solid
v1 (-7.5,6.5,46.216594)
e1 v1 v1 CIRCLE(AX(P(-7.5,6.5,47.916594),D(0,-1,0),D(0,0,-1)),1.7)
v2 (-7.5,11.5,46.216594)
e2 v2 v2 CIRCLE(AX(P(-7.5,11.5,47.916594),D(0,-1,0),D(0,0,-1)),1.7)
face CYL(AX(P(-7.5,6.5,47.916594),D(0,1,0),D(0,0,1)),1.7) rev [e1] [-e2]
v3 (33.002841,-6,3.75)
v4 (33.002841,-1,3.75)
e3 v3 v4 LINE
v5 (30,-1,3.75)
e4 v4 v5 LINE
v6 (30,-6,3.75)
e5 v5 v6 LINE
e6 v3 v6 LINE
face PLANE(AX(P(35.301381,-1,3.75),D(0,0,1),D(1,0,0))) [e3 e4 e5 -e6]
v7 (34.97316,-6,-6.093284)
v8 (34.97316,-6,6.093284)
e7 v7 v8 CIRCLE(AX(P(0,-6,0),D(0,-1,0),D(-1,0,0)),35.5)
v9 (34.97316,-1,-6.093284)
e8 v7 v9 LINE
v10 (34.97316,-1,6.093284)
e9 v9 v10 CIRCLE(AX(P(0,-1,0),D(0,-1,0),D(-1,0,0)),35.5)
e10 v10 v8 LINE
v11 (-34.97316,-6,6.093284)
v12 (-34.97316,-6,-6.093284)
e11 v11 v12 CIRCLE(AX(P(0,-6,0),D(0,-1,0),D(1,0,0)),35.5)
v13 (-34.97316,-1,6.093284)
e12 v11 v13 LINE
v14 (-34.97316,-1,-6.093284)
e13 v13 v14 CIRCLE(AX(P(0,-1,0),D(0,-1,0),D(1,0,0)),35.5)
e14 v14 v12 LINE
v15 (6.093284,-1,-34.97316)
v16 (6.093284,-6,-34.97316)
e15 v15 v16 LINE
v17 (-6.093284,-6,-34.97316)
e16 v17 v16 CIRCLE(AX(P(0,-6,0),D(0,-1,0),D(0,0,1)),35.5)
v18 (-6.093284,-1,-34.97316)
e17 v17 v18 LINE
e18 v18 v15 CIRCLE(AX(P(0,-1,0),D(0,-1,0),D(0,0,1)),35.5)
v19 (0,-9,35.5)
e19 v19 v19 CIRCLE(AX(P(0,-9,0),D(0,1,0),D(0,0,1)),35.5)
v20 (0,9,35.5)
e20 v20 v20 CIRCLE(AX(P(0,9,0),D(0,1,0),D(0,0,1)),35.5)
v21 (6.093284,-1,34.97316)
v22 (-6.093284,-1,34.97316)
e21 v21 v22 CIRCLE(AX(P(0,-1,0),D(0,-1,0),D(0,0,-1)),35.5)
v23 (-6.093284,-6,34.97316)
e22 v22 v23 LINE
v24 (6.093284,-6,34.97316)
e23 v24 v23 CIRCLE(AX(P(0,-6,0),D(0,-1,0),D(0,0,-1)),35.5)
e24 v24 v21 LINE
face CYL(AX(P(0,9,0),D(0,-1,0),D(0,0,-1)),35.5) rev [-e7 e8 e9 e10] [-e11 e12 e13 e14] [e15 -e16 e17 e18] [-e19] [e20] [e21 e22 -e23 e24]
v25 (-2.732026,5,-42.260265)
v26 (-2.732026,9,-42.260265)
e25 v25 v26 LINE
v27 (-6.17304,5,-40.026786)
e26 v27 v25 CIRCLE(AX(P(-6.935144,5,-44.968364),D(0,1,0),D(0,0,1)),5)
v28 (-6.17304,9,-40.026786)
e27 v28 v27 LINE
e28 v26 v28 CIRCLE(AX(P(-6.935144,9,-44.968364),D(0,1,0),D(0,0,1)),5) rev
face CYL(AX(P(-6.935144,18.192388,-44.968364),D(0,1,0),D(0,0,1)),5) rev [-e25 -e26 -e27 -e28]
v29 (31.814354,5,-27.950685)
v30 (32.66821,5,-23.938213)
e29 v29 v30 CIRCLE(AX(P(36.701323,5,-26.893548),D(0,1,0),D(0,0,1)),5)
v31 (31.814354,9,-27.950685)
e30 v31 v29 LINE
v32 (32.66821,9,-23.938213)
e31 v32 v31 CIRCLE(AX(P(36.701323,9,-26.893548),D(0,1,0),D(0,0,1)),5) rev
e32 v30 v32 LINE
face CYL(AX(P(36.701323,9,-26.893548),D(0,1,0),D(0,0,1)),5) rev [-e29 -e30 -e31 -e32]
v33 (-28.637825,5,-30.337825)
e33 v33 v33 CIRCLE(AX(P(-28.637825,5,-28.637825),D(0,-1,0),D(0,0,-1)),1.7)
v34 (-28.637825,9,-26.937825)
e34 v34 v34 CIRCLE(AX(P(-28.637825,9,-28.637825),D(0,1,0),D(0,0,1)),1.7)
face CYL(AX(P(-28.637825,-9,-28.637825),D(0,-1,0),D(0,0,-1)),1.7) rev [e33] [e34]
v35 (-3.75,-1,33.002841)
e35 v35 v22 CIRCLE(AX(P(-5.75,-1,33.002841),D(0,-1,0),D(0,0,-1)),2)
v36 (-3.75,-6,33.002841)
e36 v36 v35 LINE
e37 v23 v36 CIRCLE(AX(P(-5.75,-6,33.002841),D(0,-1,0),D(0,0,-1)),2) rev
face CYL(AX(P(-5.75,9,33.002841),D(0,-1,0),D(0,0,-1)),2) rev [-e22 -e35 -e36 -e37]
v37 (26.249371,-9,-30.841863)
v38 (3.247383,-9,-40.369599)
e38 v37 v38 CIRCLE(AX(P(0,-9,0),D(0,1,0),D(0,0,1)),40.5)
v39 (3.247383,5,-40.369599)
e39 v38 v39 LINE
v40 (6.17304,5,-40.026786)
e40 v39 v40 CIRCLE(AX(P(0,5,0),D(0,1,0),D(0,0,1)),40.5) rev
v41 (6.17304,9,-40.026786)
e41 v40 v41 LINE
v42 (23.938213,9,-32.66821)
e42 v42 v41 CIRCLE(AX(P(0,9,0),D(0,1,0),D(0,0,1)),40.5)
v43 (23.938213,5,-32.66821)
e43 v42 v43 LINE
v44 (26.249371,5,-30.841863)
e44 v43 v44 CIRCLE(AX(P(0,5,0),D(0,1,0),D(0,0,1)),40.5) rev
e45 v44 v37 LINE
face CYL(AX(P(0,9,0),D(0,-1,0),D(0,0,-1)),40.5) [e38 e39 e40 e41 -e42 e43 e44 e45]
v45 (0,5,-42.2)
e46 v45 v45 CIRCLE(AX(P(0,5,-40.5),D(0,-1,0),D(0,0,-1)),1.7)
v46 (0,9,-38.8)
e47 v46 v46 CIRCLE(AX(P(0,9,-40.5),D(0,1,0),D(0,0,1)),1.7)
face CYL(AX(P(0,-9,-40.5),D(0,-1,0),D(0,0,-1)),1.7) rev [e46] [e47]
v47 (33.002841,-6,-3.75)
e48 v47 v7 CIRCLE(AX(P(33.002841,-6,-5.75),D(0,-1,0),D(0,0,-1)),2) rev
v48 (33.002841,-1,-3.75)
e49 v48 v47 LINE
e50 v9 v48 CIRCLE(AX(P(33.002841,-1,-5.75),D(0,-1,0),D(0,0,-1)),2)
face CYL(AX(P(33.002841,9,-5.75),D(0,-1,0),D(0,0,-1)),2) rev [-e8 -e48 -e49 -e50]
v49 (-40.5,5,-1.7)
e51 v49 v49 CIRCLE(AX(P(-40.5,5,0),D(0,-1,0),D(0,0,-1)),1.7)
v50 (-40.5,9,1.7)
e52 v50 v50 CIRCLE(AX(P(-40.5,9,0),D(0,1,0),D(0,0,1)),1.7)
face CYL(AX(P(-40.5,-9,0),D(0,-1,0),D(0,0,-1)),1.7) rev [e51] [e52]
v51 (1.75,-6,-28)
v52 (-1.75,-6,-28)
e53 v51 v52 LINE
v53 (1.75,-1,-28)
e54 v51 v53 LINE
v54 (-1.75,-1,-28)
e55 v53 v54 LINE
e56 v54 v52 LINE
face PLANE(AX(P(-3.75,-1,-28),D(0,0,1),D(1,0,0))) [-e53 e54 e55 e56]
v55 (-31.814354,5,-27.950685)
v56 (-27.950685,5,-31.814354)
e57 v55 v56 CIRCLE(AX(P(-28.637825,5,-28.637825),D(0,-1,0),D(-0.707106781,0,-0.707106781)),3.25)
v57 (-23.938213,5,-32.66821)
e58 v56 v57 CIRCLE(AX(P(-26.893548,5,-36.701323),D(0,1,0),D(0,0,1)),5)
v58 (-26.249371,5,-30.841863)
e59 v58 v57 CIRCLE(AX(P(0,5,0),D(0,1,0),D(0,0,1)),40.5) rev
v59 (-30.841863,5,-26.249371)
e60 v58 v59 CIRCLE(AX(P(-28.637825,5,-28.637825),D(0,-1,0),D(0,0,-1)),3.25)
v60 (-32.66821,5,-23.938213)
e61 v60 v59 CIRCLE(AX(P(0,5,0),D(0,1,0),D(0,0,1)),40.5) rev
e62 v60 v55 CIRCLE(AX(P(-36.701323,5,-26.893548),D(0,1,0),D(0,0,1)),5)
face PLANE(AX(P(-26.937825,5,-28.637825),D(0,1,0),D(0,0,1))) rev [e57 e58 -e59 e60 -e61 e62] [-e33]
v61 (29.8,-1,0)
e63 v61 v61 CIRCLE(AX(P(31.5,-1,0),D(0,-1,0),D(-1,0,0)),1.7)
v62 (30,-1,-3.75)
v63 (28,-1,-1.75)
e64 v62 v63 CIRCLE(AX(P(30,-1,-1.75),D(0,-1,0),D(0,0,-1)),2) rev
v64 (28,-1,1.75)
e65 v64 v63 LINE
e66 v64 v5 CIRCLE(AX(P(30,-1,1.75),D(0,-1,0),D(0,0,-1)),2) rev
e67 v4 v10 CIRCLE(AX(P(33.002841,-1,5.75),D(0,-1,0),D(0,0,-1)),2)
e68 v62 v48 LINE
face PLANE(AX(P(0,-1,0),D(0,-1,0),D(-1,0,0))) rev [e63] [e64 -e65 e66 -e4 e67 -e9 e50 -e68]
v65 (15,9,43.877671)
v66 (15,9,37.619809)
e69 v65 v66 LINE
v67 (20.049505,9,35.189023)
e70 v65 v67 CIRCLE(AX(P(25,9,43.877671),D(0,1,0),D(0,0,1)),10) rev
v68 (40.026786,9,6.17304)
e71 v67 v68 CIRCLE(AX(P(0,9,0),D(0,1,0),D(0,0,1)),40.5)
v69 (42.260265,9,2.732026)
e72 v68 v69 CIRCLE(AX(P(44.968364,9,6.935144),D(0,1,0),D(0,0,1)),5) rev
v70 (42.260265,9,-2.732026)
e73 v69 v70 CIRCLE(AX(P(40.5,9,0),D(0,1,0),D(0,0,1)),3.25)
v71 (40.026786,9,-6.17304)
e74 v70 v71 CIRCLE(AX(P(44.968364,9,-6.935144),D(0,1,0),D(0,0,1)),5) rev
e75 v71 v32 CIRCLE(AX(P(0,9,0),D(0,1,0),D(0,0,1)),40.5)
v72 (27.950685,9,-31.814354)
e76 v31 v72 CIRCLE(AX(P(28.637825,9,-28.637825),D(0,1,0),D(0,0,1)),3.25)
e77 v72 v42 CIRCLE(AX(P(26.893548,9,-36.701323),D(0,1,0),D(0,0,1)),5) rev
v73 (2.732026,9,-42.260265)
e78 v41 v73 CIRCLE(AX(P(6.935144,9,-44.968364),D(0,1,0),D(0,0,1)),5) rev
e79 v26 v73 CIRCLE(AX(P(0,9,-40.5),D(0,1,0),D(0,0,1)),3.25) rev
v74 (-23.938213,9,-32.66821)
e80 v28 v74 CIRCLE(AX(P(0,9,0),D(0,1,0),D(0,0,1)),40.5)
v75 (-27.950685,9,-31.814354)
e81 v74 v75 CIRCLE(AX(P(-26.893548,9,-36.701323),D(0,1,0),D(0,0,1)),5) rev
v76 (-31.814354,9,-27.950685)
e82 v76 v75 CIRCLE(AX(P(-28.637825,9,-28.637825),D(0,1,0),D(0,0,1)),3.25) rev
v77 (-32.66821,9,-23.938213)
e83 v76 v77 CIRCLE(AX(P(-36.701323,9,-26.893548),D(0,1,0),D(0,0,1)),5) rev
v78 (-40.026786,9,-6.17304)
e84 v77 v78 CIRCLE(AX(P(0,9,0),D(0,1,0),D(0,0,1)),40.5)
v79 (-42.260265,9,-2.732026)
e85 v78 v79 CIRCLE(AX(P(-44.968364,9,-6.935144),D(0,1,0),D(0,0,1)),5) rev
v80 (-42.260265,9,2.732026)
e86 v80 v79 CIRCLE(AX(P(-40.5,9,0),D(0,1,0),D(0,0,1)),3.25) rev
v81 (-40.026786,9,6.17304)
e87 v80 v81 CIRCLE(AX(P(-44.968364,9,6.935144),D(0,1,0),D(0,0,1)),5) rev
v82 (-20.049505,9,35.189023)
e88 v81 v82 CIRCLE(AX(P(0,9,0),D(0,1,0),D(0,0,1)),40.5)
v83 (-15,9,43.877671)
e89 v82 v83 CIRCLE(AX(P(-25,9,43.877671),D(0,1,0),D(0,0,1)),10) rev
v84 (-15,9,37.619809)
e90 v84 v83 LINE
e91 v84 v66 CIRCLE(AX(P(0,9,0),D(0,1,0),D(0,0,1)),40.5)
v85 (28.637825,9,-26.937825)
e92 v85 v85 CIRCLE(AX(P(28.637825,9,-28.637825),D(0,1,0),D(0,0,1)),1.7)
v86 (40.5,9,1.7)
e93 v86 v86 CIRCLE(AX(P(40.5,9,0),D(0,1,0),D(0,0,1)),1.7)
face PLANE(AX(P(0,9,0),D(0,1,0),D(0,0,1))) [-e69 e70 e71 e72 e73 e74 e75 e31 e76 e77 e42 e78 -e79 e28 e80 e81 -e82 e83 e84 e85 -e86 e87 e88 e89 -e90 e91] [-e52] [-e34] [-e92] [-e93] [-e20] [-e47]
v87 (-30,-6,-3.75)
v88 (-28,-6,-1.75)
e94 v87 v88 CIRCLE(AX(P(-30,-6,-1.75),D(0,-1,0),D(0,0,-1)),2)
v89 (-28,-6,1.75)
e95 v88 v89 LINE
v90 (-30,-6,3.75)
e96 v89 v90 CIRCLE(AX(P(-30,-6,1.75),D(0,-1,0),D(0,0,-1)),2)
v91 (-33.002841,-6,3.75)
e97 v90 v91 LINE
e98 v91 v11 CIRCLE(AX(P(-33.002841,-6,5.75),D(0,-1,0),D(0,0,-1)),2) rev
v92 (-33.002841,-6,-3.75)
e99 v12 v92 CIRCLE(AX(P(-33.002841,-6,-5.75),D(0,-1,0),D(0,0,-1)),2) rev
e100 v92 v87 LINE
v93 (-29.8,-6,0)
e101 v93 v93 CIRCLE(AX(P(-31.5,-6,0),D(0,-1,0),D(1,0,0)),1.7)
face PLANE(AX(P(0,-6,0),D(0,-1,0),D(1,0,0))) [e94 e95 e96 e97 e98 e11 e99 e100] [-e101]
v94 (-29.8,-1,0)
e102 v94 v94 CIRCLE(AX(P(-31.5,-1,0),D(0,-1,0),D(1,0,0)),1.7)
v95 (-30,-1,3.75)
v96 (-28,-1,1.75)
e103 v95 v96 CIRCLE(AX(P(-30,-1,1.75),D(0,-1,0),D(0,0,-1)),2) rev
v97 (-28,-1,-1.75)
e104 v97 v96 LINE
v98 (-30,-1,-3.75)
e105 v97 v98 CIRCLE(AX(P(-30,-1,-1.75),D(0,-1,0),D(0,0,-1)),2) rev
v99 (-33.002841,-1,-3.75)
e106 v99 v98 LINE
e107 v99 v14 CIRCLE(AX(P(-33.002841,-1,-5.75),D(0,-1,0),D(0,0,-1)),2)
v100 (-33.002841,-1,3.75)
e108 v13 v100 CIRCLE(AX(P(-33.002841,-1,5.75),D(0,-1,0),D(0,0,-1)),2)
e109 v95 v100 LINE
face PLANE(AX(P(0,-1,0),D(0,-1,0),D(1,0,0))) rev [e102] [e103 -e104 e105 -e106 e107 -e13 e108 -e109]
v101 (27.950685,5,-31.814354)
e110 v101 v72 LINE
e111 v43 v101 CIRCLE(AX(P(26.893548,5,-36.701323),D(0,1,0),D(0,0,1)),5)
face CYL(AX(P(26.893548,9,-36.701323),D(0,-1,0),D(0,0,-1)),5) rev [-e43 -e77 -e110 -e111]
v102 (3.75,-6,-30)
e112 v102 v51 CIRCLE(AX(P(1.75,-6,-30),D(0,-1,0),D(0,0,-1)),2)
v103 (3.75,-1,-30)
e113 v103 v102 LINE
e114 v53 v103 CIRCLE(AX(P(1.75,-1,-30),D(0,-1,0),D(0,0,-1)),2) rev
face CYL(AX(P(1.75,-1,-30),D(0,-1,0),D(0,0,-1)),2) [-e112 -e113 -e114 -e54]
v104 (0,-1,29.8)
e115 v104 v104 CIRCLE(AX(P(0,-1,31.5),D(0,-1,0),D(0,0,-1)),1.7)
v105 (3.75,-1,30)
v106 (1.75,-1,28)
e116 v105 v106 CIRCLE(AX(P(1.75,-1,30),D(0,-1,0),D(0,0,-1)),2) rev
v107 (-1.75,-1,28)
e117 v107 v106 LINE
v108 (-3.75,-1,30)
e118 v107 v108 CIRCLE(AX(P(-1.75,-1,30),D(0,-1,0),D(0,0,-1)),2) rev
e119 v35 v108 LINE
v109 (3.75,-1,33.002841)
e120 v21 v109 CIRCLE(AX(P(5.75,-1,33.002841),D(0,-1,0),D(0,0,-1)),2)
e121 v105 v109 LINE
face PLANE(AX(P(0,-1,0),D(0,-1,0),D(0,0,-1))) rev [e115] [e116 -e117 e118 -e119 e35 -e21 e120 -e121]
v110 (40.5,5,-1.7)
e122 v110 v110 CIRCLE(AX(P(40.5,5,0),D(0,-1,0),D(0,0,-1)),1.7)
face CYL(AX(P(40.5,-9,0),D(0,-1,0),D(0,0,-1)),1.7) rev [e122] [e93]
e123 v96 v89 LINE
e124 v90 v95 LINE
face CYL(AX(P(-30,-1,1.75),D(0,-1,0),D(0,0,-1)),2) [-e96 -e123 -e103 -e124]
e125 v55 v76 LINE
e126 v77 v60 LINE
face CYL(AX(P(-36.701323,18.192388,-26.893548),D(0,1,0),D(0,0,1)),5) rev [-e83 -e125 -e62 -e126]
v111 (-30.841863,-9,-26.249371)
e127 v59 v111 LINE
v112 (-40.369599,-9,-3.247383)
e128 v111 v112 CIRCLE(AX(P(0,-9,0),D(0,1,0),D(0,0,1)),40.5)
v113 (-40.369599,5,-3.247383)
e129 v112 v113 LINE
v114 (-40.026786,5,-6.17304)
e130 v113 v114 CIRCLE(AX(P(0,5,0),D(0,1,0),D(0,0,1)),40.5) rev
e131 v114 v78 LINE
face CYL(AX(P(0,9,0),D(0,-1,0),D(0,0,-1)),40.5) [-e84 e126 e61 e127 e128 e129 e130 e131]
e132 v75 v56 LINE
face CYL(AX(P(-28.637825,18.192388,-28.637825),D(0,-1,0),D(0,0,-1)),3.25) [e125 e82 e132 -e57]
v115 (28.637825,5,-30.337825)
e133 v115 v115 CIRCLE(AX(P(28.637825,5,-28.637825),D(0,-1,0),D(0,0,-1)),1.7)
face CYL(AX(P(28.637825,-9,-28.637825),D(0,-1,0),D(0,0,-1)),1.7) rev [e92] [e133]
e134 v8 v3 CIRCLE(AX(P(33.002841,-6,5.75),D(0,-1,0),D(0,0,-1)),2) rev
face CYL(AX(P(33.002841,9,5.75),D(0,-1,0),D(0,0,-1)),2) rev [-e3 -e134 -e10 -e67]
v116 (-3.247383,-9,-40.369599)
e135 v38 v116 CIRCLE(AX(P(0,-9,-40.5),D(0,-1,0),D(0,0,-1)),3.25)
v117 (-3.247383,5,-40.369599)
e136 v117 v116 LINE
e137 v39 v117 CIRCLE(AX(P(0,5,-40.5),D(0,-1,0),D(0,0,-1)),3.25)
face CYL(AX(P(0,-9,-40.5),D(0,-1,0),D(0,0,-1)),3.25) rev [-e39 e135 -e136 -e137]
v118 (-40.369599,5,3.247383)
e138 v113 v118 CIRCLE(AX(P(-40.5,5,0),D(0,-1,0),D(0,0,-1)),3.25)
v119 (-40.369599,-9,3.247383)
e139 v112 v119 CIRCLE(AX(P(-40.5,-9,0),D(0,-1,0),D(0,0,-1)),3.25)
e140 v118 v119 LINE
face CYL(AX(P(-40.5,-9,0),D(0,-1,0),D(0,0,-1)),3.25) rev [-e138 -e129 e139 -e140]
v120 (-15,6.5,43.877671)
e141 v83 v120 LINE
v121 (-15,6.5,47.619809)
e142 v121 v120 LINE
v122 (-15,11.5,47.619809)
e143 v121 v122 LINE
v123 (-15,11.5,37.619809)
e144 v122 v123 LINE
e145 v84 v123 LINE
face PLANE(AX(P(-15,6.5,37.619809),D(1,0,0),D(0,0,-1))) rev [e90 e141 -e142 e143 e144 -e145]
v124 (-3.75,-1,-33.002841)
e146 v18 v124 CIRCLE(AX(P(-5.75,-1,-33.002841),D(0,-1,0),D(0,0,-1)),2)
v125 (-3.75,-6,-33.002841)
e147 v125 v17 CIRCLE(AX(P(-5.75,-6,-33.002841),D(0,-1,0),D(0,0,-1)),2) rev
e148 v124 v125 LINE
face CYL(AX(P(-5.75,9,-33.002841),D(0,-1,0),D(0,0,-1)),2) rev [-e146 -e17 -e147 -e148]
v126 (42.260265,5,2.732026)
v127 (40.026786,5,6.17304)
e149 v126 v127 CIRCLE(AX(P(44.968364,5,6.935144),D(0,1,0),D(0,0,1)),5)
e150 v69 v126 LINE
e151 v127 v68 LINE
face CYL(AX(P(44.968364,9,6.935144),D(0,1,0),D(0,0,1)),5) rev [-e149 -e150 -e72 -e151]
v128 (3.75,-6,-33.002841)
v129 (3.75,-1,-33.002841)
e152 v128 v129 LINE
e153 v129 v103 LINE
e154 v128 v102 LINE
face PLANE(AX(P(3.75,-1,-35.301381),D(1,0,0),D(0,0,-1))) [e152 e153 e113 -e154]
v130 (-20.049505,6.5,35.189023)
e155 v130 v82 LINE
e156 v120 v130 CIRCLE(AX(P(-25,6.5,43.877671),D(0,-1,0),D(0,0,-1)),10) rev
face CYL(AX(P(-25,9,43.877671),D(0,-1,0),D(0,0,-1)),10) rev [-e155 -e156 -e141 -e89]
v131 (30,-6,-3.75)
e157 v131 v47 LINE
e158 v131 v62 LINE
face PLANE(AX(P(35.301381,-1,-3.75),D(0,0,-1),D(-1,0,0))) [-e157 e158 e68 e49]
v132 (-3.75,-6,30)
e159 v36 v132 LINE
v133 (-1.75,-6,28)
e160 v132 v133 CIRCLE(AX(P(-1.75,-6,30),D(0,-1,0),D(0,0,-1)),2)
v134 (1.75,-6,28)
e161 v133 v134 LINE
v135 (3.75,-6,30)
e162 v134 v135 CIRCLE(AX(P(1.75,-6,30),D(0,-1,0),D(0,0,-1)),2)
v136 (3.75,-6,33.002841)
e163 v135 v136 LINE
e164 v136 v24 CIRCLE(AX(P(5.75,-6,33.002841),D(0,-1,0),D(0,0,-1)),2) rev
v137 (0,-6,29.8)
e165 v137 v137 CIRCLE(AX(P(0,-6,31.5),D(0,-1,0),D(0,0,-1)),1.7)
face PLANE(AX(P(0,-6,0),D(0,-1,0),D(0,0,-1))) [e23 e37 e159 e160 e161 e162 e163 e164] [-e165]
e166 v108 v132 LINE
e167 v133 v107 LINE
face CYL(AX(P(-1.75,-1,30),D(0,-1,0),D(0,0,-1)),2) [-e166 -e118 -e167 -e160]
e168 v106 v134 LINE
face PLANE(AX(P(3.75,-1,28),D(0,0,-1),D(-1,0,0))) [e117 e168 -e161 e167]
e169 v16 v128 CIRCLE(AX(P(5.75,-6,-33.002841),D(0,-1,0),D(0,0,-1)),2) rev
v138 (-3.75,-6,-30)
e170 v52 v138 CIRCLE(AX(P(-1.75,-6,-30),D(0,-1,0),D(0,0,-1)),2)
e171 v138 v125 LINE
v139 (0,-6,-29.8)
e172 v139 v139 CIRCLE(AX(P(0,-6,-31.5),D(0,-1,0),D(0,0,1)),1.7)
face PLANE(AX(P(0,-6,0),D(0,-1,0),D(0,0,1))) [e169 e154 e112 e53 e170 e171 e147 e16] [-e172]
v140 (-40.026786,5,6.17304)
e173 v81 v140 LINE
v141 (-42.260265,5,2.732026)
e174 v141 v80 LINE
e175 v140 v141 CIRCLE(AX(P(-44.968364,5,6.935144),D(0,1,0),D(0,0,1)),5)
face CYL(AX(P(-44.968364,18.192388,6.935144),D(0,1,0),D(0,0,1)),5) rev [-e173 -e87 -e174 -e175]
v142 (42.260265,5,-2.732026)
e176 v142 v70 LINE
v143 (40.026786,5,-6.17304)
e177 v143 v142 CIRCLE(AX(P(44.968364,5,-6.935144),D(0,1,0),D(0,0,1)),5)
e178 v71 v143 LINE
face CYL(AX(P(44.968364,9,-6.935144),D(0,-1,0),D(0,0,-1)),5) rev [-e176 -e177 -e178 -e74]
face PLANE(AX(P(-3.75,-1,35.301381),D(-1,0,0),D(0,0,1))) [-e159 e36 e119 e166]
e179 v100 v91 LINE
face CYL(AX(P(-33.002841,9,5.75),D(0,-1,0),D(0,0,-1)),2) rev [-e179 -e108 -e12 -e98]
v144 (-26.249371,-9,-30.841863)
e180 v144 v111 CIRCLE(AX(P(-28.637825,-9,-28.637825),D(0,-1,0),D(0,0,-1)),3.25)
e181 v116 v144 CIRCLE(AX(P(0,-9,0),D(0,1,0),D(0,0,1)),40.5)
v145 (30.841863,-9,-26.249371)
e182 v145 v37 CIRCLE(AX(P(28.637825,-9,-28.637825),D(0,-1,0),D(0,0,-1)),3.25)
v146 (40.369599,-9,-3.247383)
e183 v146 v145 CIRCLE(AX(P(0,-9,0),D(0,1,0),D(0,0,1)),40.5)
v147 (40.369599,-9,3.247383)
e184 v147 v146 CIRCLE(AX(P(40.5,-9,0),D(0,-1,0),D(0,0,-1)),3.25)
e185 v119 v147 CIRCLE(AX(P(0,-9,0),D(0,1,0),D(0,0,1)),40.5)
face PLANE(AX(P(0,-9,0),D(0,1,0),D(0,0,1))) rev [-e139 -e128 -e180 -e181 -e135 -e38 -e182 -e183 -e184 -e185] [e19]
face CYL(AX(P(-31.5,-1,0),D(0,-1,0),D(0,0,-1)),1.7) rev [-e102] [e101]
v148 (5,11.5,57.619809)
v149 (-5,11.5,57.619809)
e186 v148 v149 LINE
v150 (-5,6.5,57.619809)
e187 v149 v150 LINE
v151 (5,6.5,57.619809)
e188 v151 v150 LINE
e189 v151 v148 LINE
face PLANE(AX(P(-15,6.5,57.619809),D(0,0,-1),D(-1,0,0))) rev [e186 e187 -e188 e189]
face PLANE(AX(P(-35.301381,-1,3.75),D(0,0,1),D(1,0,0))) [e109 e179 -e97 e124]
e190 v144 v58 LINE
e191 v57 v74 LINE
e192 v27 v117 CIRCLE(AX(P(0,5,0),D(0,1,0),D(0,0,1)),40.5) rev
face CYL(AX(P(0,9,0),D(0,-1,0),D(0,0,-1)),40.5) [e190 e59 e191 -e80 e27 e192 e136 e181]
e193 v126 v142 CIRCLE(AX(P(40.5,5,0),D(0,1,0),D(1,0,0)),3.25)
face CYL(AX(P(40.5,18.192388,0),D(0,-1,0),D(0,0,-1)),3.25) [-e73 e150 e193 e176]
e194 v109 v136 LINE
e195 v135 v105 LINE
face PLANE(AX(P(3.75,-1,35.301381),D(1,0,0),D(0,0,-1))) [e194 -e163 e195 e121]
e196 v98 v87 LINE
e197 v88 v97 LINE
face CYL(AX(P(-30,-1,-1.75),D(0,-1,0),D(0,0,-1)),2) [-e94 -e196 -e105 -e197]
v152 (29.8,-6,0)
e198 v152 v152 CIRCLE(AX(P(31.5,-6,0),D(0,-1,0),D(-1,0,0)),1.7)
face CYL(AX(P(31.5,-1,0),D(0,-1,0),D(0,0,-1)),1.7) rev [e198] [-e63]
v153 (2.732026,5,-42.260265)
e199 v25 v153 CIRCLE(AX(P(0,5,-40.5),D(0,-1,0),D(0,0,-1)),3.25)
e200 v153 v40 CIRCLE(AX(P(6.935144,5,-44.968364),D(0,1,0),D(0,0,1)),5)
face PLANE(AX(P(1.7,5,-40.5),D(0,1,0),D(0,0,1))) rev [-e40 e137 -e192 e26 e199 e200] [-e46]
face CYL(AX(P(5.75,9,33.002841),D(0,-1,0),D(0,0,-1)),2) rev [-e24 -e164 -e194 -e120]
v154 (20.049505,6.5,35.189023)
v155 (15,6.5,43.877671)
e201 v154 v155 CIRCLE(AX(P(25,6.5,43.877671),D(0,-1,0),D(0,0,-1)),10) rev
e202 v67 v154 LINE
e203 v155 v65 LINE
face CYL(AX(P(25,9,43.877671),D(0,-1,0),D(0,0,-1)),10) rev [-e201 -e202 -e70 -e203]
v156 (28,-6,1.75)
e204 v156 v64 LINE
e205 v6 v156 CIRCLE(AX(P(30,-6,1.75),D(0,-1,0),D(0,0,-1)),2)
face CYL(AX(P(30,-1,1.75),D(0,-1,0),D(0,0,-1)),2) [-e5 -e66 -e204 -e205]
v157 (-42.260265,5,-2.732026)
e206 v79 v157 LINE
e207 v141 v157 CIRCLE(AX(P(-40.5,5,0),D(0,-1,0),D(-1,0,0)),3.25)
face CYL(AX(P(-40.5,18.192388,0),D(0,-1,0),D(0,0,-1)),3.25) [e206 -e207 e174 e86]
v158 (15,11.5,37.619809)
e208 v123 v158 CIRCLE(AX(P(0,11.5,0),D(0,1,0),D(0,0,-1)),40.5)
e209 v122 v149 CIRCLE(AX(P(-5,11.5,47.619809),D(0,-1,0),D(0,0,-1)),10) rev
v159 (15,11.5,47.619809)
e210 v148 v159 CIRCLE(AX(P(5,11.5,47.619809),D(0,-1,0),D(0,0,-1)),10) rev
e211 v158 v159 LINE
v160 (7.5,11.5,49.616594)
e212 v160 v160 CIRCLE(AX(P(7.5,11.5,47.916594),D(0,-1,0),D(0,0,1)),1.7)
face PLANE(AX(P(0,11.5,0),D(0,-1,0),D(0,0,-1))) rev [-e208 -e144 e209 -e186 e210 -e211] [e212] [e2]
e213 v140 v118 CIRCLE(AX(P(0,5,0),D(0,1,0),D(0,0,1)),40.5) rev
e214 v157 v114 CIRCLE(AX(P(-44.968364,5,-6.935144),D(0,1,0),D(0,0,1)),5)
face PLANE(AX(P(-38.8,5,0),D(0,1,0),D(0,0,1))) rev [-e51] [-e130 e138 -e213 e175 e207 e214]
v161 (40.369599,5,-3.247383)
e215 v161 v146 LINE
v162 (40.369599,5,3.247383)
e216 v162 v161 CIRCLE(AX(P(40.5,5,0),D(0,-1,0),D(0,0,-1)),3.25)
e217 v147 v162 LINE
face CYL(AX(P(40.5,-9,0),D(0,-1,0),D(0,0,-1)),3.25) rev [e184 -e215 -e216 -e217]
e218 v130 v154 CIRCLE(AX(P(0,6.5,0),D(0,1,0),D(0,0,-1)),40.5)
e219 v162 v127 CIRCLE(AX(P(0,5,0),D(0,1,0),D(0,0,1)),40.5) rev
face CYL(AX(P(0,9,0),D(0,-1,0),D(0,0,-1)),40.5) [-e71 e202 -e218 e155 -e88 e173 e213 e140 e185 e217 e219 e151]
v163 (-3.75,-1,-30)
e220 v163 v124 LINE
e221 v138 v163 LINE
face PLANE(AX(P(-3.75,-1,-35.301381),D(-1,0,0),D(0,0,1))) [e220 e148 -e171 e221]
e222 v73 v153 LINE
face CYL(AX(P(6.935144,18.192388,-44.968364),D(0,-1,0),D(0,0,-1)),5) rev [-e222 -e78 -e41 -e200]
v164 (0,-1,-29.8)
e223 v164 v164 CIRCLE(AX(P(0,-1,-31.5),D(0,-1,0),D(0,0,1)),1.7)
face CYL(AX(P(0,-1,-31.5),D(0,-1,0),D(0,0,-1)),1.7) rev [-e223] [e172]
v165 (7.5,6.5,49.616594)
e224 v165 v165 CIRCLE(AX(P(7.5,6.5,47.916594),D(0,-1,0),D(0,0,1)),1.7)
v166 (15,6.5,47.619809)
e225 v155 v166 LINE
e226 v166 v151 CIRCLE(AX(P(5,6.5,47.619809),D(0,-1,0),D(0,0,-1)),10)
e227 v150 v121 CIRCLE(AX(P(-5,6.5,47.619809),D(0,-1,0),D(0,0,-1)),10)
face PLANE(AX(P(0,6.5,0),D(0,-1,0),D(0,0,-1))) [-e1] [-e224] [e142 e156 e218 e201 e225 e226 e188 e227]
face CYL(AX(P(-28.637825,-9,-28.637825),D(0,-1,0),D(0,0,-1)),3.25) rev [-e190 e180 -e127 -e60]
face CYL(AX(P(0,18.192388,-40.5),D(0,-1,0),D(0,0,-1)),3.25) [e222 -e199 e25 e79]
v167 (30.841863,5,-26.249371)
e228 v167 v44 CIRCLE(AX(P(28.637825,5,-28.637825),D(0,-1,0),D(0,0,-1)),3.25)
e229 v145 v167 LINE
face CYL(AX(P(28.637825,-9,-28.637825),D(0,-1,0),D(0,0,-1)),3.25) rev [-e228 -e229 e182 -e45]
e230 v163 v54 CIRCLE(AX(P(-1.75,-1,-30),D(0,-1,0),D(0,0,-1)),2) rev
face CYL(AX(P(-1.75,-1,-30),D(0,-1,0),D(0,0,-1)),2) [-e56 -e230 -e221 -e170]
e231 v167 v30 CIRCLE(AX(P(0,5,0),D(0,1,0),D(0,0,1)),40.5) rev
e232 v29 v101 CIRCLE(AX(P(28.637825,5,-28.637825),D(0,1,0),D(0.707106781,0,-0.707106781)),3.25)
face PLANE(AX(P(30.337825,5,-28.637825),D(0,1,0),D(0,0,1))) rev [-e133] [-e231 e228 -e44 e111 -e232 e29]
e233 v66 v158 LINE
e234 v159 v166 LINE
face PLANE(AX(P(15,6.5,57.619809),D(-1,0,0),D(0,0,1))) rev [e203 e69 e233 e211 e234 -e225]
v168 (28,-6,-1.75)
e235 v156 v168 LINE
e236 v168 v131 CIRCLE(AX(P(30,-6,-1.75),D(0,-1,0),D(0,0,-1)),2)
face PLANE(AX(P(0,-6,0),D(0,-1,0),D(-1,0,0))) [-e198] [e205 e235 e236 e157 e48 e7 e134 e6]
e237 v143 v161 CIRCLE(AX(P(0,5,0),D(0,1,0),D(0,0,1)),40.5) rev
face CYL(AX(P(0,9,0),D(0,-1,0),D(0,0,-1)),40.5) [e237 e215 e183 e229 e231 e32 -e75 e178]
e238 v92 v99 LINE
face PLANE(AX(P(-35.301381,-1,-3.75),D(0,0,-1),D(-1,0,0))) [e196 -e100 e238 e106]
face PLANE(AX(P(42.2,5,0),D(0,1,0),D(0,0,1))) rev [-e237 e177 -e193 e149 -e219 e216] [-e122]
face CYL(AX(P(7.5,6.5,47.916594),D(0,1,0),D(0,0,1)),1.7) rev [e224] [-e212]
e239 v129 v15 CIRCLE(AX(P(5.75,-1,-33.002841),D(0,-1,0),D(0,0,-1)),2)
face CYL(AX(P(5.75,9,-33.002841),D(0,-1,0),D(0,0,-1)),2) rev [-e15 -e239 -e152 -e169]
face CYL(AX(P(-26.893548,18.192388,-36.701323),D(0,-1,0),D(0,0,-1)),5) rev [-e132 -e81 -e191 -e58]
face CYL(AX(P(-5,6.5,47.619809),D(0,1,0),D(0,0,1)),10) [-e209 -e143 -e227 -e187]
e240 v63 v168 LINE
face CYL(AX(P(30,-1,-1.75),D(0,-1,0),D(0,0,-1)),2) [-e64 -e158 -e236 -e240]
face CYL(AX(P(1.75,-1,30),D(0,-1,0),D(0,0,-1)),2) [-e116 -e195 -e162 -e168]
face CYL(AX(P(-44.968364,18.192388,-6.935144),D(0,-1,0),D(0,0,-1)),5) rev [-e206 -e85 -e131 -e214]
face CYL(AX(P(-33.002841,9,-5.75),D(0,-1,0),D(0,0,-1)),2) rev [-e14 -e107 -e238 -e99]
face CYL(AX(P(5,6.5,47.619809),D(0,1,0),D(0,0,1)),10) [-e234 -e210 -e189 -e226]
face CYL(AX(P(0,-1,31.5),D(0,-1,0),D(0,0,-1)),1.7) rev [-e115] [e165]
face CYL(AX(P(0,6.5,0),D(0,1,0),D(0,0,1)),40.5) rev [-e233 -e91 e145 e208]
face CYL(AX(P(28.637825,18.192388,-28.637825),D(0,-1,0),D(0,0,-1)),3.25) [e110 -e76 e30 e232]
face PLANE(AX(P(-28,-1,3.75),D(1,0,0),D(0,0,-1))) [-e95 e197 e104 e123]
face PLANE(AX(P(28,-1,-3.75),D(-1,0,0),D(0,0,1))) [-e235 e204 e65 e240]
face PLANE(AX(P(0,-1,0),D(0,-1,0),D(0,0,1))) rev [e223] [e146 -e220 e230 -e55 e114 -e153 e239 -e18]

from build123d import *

# Parameters (mm, degrees)
CROQUIS1_R                                           = 40.5
CROQUIS1_R_2                                         = 35.5
SALIENTE_EXTRUIR1_DEPTH                              = 9
CROQUIS2_R                                           = 1.7
SALIENTE_EXTRUIR2_DEPTH                              = 2.5
REDONDEO1_R                                          = 10
CROQUIS4_R                                           = 1.7
SALIENTE_EXTRUIR3_DEPTH                              = 5
REDONDEO2_R                                          = 2
MATRIZC1_COUNT                                       = 4
REDONDEO2_OF_MATRIZC1_R                              = 2
REFRENTADO_PARA_TORNILLO_CON_CABEZA_PLAN_D           = 3.4
REFRENTADO_PARA_TORNILLO_CON_CABEZA_PLAN_CBORE_D     = 6.5
REFRENTADO_PARA_TORNILLO_CON_CABEZA_PLAN_CBORE_DEPTH = 14
CROQUIS8_R                                           = 3.25
CROQUIS8_R_2                                         = 1.7
SALIENTE_EXTRUIR4_DEPTH                              = 4
MATRIZC2_COUNT                                       = 3
MATRIZC2_ANGLE                                       = 90
SIMETR_A1_COPY_1_D                                   = 3.4
SIMETR_A1_COPY_1_CBORE_D                             = 6.5
SIMETR_A1_COPY_1_CBORE_DEPTH                         = 14
SIMETR_A1_COPY_2_D                                   = 3.4
SIMETR_A1_COPY_2_CBORE_D                             = 6.5
SIMETR_A1_COPY_2_CBORE_DEPTH                         = 14
SIMETR_A1_COPY_3_SKETCH_R                            = 3.25
SIMETR_A1_COPY_3_SKETCH_R_2                          = 1.7
SIMETR_A1_COPY_3_DEPTH                               = 4
SIMETR_A1_COPY_4_SKETCH_R                            = 3.25
SIMETR_A1_COPY_4_SKETCH_R_2                          = 1.7
SIMETR_A1_COPY_4_DEPTH                               = 4
SIMETR_A1_COPY_5_D                                   = 3.4
SIMETR_A1_COPY_5_CBORE_D                             = 6.5
SIMETR_A1_COPY_5_CBORE_DEPTH                         = 14
SIMETR_A1_COPY_6_SKETCH_R                            = 3.25
SIMETR_A1_COPY_6_SKETCH_R_2                          = 1.7
SIMETR_A1_COPY_6_DEPTH                               = 4
REDONDEO4_R                                          = 5


with BuildPart() as part:
    # Croquis1 → Saliente-Extruir1 (new, symmetric)
    with BuildSketch(Plane(origin=(0, 0, 0), x_dir=(1, 0, 0), z_dir=(0, 1, 0))):
        with Locations(Location((0, 0, 0), (0, 0, 270))):
            Circle(CROQUIS1_R)
        with Locations(Location((0, 0, 0), (0, 0, 270))):
            Circle(CROQUIS1_R_2, mode=Mode.SUBTRACT)
    extrude(amount=SALIENTE_EXTRUIR1_DEPTH, both=True)

    # Croquis2 → Saliente-Extruir2 (add, symmetric)
    with BuildSketch(Plane.XZ.offset(-9)):
        with BuildLine():
            Line((-15, 37.619808612), (-15, 57.619808612))
            Line((-15, 57.619808612), (15, 57.619808612))
            Line((15, 57.619808612), (15, 37.619808612))
            ThreePointArc((15, 37.619808612), (0, 40.5), (-15, 37.619808612))
        make_face()
        with Locations(Location((-7.5, 47.916594203, 0), (0, 0, 270))):
            Circle(CROQUIS2_R, mode=Mode.SUBTRACT)
        with Locations(Location((7.5, 47.916594203, 0), (0, 0, 90))):
            Circle(CROQUIS2_R, mode=Mode.SUBTRACT)
    extrude(amount=SALIENTE_EXTRUIR2_DEPTH, both=True)

    # Redondeo1
    redondeo1_edges = [part.edges().sort_by_distance(p)[0] for p in [
        (-15, 7.75, 37.619808612),
        (15, 7.75, 37.619808612),
        (15, 9, 57.619808612),
        (-15, 9, 57.619808612),
    ]]
    fillet(redondeo1_edges, radius=REDONDEO1_R)

    # Croquis4 → Saliente-Extruir3 (add)
    with BuildSketch(Plane(origin=(0, -6, 0), x_dir=(-1, 0, 0), z_dir=(0, -1, 0))):
        with BuildLine():
            Line((-3.75, -35.301380993), (-3.75, -28))
            Line((-3.75, -28), (3.75, -28))
            Line((3.75, -28), (3.75, -35.301380993))
            ThreePointArc((3.75, -35.301380993), (0, -35.5), (-3.75, -35.301380993))
        make_face()
        with Locations(Location((0, -31.5, 0), (0, 0, 90))):
            Circle(CROQUIS4_R, mode=Mode.SUBTRACT)
    saliente_extruir3 = extrude(amount=-SALIENTE_EXTRUIR3_DEPTH)

    # Redondeo2
    redondeo2_edges = [part.edges().sort_by_distance(p)[0] for p in [
        (-3.75, -3.5, 35.301380993),
        (3.75, -3.5, 35.301380993),
        (3.75, -3.5, 28),
        (-3.75, -3.5, 28),
    ]]
    fillet(redondeo2_edges, radius=REDONDEO2_R)

    # MatrizC1: Saliente-Extruir3 ×4 about axis
    matrizc1_axis = Axis((0, 0, 0), (0, 1, 0))
    for i in range(1, MATRIZC1_COUNT):
        add(saliente_extruir3.rotate(matrizc1_axis, i * 360 / MATRIZC1_COUNT))

    # Redondeo2 of MatrizC1
    redondeo2_of_matrizc1_edges = [part.edges().sort_by_distance(p)[0] for p in [
        (35.301380993, -3.5, 3.75),
        (35.301380993, -3.5, -3.75),
        (28, -3.5, -3.75),
        (28, -3.5, 3.75),
        (3.75, -3.5, -35.301380993),
        (-3.75, -3.5, -35.301380993),
        (-3.75, -3.5, -28),
        (3.75, -3.5, -28),
        (-35.301380993, -3.5, -3.75),
        (-35.301380993, -3.5, 3.75),
        (-28, -3.5, 3.75),
        (-28, -3.5, -3.75),
    ]]
    fillet(redondeo2_of_matrizc1_edges, radius=REDONDEO2_OF_MATRIZC1_R)

    # Refrentado para tornillo con cabeza plana de M31 (through all)
    with Locations(Plane(origin=(0, -9, 0), x_dir=(-1, 0, 0), z_dir=(0, -1, 0))):
        with Locations((0, 40.5)):
            refrentado_para_tornillo_con_cabeza_plan = CounterBoreHole(REFRENTADO_PARA_TORNILLO_CON_CABEZA_PLAN_D / 2, REFRENTADO_PARA_TORNILLO_CON_CABEZA_PLAN_CBORE_D / 2, REFRENTADO_PARA_TORNILLO_CON_CABEZA_PLAN_CBORE_DEPTH)

    # Croquis8 → Saliente-Extruir4 (add)
    with BuildSketch(Plane.XZ.offset(-5)):
        with Locations((0, -40.5)):
            Circle(CROQUIS8_R)
        with Locations(Location((0, -40.5, 0), (0, 0, 270))):
            Circle(CROQUIS8_R_2, mode=Mode.SUBTRACT)
    saliente_extruir4 = extrude(amount=-SALIENTE_EXTRUIR4_DEPTH)

    # MatrizC2: Refrentado para tornillo con cabeza plana de M31, Saliente-Extruir4 ×3 about axis
    matrizc2_axis = Axis((0, 0, 0), (0, 1, 0))
    add([refrentado_para_tornillo_con_cabeza_plan.rotate(matrizc2_axis, i * MATRIZC2_ANGLE / (MATRIZC2_COUNT - 1)) for i in range(1, MATRIZC2_COUNT)], mode=Mode.SUBTRACT)
    add([saliente_extruir4.rotate(matrizc2_axis, i * MATRIZC2_ANGLE / (MATRIZC2_COUNT - 1)) for i in range(1, MATRIZC2_COUNT)])

    # Simetría1 copy 1 (through all)
    with Locations(Plane(origin=(0, -9, 0), x_dir=(0.7071067811865467, 0, 0.7071067811865483), z_dir=(0, -1, 0))):
        with Locations((0, -40.5)):
            CounterBoreHole(SIMETR_A1_COPY_1_D / 2, SIMETR_A1_COPY_1_CBORE_D / 2, SIMETR_A1_COPY_1_CBORE_DEPTH)

    # Simetría1 copy 2 (through all)
    with Locations(Plane(origin=(0, -9, 0), x_dir=(0, 0, 1), z_dir=(0, -1, 0))):
        with Locations((0, -40.5)):
            CounterBoreHole(SIMETR_A1_COPY_2_D / 2, SIMETR_A1_COPY_2_CBORE_D / 2, SIMETR_A1_COPY_2_CBORE_DEPTH)

    # Simetría1 copy 3 sketch → Simetría1 copy 3 (add)
    with BuildSketch(Plane(origin=(0, 5, 0), x_dir=(-0.7071067811865467, 0, -0.7071067811865483), z_dir=(0, -1, 0))):
        with Locations((0, 40.5)):
            Circle(SIMETR_A1_COPY_3_SKETCH_R)
        with Locations((0, 40.5)):
            Circle(SIMETR_A1_COPY_3_SKETCH_R_2, mode=Mode.SUBTRACT)
    extrude(amount=-SIMETR_A1_COPY_3_DEPTH)

    # Simetría1 copy 4 sketch → Simetría1 copy 4 (add)
    with BuildSketch(Plane(origin=(0, 5, 0), x_dir=(0, 0, -1), z_dir=(0, -1, 0))):
        with Locations((0, 40.5)):
            Circle(SIMETR_A1_COPY_4_SKETCH_R)
        with Locations((0, 40.5)):
            Circle(SIMETR_A1_COPY_4_SKETCH_R_2, mode=Mode.SUBTRACT)
    extrude(amount=-SIMETR_A1_COPY_4_DEPTH)

    # Simetría1 copy 5 (through all)
    with Locations(Plane.XZ.offset(9)):
        with Locations((0, -40.5)):
            CounterBoreHole(SIMETR_A1_COPY_5_D / 2, SIMETR_A1_COPY_5_CBORE_D / 2, SIMETR_A1_COPY_5_CBORE_DEPTH)

    # Simetría1 copy 6 sketch → Simetría1 copy 6 (add)
    with BuildSketch(Plane(origin=(0, 5, 0), x_dir=(-1, 0, 0), z_dir=(0, -1, 0))):
        with Locations((0, 40.5)):
            Circle(SIMETR_A1_COPY_6_SKETCH_R)
        with Locations((0, 40.5)):
            Circle(SIMETR_A1_COPY_6_SKETCH_R_2, mode=Mode.SUBTRACT)
    extrude(amount=-SIMETR_A1_COPY_6_DEPTH)

    # Redondeo4
    # the kernel refuses this fillet: 5 mm, written as the material it adds along each edge
    with BuildSketch(Plane(origin=(3.247382872, 5, -40.369598765), x_dir=(-0.26298456130180026, 0, -0.9648000417272481), z_dir=(0, 1, 0)), Plane(origin=(-26.249370591, 5, -30.841863491), x_dir=(-0.8681748186382738, 0, -0.4962584853505281), z_dir=(0, 1, 0)), Plane(origin=(-40.369598765, 5, -3.247382872), x_dir=(-0.9648000417272475, 0, 0.2629845613018025), z_dir=(0, 1, 0)), Plane(origin=(30.841863491, 5, -26.249370591), x_dir=(0.49625848535052886, 0, -0.8681748186382734), z_dir=(0, 1, 0)), Plane(origin=(40.369598765, 5, 3.247382872), x_dir=(0.9648000417272491, 0, -0.2629845613017969), z_dir=(0, 1, 0))) as redondeo4_piece_1:
        with BuildLine():
            CenterArc((3.467064855, -4.767356337), REDONDEO4_R, 107.546751442, 48.438780652)
            ThreePointArc((-1.100148756, -2.732519778), (-0.525223225, -1.376265293), (0, 0))
            ThreePointArc((0, 0), (0.979822677, -0.151218381), (1.959645353, 0))
        make_face()
    extrude(amount=4)
    with BuildSketch(Plane(origin=(-3.247382872, 5, -40.369598765), x_dir=(-0.9932049358227855, 0, 0.11637850083781144), z_dir=(0, 1, 0)), Plane(origin=(-30.841863491, 5, -26.249370591), x_dir=(-0.6200099181014976, 0, 0.7845939723549846), z_dir=(0, 1, 0)), Plane(origin=(26.249370591, 5, -30.841863491), x_dir=(-0.784593972354982, 0, -0.6200099181015007), z_dir=(0, 1, 0)), Plane(origin=(40.369598765, 5, -3.247382872), x_dir=(-0.1163785008378116, 0, -0.9932049358227855), z_dir=(0, 1, 0))) as redondeo4_piece_2:
        with BuildLine():
            CenterArc((3.127505063, -4.99669263), REDONDEO4_R, 92.084097226, 48.438780652)
            ThreePointArc((-0.731887458, -1.817842308), (-0.22566775, -0.965398127), (0, 0))
            ThreePointArc((0, 0), (1.472836687, -0.026789699), (2.945673373, 0))
        make_face()
    extrude(amount=4)
    with BuildSketch(Plane(origin=(-40.369598765, 5, 3.247382872), x_dir=(-0.9648000417272488, 0, -0.262984561301798), z_dir=(0, 1, 0))) as redondeo4_piece_3:
        with BuildLine():
            CenterArc((3.467064855, 4.767356337), REDONDEO4_R, 204.014467906, 48.438780652)
            ThreePointArc((-1.100148756, 2.732519778), (-0.525223225, 1.376265293), (0, 0))
            ThreePointArc((0, 0), (0.979822677, 0.151218381), (1.959645353, 0))
        make_face()
    extrude(amount=4)


solid = part.part
